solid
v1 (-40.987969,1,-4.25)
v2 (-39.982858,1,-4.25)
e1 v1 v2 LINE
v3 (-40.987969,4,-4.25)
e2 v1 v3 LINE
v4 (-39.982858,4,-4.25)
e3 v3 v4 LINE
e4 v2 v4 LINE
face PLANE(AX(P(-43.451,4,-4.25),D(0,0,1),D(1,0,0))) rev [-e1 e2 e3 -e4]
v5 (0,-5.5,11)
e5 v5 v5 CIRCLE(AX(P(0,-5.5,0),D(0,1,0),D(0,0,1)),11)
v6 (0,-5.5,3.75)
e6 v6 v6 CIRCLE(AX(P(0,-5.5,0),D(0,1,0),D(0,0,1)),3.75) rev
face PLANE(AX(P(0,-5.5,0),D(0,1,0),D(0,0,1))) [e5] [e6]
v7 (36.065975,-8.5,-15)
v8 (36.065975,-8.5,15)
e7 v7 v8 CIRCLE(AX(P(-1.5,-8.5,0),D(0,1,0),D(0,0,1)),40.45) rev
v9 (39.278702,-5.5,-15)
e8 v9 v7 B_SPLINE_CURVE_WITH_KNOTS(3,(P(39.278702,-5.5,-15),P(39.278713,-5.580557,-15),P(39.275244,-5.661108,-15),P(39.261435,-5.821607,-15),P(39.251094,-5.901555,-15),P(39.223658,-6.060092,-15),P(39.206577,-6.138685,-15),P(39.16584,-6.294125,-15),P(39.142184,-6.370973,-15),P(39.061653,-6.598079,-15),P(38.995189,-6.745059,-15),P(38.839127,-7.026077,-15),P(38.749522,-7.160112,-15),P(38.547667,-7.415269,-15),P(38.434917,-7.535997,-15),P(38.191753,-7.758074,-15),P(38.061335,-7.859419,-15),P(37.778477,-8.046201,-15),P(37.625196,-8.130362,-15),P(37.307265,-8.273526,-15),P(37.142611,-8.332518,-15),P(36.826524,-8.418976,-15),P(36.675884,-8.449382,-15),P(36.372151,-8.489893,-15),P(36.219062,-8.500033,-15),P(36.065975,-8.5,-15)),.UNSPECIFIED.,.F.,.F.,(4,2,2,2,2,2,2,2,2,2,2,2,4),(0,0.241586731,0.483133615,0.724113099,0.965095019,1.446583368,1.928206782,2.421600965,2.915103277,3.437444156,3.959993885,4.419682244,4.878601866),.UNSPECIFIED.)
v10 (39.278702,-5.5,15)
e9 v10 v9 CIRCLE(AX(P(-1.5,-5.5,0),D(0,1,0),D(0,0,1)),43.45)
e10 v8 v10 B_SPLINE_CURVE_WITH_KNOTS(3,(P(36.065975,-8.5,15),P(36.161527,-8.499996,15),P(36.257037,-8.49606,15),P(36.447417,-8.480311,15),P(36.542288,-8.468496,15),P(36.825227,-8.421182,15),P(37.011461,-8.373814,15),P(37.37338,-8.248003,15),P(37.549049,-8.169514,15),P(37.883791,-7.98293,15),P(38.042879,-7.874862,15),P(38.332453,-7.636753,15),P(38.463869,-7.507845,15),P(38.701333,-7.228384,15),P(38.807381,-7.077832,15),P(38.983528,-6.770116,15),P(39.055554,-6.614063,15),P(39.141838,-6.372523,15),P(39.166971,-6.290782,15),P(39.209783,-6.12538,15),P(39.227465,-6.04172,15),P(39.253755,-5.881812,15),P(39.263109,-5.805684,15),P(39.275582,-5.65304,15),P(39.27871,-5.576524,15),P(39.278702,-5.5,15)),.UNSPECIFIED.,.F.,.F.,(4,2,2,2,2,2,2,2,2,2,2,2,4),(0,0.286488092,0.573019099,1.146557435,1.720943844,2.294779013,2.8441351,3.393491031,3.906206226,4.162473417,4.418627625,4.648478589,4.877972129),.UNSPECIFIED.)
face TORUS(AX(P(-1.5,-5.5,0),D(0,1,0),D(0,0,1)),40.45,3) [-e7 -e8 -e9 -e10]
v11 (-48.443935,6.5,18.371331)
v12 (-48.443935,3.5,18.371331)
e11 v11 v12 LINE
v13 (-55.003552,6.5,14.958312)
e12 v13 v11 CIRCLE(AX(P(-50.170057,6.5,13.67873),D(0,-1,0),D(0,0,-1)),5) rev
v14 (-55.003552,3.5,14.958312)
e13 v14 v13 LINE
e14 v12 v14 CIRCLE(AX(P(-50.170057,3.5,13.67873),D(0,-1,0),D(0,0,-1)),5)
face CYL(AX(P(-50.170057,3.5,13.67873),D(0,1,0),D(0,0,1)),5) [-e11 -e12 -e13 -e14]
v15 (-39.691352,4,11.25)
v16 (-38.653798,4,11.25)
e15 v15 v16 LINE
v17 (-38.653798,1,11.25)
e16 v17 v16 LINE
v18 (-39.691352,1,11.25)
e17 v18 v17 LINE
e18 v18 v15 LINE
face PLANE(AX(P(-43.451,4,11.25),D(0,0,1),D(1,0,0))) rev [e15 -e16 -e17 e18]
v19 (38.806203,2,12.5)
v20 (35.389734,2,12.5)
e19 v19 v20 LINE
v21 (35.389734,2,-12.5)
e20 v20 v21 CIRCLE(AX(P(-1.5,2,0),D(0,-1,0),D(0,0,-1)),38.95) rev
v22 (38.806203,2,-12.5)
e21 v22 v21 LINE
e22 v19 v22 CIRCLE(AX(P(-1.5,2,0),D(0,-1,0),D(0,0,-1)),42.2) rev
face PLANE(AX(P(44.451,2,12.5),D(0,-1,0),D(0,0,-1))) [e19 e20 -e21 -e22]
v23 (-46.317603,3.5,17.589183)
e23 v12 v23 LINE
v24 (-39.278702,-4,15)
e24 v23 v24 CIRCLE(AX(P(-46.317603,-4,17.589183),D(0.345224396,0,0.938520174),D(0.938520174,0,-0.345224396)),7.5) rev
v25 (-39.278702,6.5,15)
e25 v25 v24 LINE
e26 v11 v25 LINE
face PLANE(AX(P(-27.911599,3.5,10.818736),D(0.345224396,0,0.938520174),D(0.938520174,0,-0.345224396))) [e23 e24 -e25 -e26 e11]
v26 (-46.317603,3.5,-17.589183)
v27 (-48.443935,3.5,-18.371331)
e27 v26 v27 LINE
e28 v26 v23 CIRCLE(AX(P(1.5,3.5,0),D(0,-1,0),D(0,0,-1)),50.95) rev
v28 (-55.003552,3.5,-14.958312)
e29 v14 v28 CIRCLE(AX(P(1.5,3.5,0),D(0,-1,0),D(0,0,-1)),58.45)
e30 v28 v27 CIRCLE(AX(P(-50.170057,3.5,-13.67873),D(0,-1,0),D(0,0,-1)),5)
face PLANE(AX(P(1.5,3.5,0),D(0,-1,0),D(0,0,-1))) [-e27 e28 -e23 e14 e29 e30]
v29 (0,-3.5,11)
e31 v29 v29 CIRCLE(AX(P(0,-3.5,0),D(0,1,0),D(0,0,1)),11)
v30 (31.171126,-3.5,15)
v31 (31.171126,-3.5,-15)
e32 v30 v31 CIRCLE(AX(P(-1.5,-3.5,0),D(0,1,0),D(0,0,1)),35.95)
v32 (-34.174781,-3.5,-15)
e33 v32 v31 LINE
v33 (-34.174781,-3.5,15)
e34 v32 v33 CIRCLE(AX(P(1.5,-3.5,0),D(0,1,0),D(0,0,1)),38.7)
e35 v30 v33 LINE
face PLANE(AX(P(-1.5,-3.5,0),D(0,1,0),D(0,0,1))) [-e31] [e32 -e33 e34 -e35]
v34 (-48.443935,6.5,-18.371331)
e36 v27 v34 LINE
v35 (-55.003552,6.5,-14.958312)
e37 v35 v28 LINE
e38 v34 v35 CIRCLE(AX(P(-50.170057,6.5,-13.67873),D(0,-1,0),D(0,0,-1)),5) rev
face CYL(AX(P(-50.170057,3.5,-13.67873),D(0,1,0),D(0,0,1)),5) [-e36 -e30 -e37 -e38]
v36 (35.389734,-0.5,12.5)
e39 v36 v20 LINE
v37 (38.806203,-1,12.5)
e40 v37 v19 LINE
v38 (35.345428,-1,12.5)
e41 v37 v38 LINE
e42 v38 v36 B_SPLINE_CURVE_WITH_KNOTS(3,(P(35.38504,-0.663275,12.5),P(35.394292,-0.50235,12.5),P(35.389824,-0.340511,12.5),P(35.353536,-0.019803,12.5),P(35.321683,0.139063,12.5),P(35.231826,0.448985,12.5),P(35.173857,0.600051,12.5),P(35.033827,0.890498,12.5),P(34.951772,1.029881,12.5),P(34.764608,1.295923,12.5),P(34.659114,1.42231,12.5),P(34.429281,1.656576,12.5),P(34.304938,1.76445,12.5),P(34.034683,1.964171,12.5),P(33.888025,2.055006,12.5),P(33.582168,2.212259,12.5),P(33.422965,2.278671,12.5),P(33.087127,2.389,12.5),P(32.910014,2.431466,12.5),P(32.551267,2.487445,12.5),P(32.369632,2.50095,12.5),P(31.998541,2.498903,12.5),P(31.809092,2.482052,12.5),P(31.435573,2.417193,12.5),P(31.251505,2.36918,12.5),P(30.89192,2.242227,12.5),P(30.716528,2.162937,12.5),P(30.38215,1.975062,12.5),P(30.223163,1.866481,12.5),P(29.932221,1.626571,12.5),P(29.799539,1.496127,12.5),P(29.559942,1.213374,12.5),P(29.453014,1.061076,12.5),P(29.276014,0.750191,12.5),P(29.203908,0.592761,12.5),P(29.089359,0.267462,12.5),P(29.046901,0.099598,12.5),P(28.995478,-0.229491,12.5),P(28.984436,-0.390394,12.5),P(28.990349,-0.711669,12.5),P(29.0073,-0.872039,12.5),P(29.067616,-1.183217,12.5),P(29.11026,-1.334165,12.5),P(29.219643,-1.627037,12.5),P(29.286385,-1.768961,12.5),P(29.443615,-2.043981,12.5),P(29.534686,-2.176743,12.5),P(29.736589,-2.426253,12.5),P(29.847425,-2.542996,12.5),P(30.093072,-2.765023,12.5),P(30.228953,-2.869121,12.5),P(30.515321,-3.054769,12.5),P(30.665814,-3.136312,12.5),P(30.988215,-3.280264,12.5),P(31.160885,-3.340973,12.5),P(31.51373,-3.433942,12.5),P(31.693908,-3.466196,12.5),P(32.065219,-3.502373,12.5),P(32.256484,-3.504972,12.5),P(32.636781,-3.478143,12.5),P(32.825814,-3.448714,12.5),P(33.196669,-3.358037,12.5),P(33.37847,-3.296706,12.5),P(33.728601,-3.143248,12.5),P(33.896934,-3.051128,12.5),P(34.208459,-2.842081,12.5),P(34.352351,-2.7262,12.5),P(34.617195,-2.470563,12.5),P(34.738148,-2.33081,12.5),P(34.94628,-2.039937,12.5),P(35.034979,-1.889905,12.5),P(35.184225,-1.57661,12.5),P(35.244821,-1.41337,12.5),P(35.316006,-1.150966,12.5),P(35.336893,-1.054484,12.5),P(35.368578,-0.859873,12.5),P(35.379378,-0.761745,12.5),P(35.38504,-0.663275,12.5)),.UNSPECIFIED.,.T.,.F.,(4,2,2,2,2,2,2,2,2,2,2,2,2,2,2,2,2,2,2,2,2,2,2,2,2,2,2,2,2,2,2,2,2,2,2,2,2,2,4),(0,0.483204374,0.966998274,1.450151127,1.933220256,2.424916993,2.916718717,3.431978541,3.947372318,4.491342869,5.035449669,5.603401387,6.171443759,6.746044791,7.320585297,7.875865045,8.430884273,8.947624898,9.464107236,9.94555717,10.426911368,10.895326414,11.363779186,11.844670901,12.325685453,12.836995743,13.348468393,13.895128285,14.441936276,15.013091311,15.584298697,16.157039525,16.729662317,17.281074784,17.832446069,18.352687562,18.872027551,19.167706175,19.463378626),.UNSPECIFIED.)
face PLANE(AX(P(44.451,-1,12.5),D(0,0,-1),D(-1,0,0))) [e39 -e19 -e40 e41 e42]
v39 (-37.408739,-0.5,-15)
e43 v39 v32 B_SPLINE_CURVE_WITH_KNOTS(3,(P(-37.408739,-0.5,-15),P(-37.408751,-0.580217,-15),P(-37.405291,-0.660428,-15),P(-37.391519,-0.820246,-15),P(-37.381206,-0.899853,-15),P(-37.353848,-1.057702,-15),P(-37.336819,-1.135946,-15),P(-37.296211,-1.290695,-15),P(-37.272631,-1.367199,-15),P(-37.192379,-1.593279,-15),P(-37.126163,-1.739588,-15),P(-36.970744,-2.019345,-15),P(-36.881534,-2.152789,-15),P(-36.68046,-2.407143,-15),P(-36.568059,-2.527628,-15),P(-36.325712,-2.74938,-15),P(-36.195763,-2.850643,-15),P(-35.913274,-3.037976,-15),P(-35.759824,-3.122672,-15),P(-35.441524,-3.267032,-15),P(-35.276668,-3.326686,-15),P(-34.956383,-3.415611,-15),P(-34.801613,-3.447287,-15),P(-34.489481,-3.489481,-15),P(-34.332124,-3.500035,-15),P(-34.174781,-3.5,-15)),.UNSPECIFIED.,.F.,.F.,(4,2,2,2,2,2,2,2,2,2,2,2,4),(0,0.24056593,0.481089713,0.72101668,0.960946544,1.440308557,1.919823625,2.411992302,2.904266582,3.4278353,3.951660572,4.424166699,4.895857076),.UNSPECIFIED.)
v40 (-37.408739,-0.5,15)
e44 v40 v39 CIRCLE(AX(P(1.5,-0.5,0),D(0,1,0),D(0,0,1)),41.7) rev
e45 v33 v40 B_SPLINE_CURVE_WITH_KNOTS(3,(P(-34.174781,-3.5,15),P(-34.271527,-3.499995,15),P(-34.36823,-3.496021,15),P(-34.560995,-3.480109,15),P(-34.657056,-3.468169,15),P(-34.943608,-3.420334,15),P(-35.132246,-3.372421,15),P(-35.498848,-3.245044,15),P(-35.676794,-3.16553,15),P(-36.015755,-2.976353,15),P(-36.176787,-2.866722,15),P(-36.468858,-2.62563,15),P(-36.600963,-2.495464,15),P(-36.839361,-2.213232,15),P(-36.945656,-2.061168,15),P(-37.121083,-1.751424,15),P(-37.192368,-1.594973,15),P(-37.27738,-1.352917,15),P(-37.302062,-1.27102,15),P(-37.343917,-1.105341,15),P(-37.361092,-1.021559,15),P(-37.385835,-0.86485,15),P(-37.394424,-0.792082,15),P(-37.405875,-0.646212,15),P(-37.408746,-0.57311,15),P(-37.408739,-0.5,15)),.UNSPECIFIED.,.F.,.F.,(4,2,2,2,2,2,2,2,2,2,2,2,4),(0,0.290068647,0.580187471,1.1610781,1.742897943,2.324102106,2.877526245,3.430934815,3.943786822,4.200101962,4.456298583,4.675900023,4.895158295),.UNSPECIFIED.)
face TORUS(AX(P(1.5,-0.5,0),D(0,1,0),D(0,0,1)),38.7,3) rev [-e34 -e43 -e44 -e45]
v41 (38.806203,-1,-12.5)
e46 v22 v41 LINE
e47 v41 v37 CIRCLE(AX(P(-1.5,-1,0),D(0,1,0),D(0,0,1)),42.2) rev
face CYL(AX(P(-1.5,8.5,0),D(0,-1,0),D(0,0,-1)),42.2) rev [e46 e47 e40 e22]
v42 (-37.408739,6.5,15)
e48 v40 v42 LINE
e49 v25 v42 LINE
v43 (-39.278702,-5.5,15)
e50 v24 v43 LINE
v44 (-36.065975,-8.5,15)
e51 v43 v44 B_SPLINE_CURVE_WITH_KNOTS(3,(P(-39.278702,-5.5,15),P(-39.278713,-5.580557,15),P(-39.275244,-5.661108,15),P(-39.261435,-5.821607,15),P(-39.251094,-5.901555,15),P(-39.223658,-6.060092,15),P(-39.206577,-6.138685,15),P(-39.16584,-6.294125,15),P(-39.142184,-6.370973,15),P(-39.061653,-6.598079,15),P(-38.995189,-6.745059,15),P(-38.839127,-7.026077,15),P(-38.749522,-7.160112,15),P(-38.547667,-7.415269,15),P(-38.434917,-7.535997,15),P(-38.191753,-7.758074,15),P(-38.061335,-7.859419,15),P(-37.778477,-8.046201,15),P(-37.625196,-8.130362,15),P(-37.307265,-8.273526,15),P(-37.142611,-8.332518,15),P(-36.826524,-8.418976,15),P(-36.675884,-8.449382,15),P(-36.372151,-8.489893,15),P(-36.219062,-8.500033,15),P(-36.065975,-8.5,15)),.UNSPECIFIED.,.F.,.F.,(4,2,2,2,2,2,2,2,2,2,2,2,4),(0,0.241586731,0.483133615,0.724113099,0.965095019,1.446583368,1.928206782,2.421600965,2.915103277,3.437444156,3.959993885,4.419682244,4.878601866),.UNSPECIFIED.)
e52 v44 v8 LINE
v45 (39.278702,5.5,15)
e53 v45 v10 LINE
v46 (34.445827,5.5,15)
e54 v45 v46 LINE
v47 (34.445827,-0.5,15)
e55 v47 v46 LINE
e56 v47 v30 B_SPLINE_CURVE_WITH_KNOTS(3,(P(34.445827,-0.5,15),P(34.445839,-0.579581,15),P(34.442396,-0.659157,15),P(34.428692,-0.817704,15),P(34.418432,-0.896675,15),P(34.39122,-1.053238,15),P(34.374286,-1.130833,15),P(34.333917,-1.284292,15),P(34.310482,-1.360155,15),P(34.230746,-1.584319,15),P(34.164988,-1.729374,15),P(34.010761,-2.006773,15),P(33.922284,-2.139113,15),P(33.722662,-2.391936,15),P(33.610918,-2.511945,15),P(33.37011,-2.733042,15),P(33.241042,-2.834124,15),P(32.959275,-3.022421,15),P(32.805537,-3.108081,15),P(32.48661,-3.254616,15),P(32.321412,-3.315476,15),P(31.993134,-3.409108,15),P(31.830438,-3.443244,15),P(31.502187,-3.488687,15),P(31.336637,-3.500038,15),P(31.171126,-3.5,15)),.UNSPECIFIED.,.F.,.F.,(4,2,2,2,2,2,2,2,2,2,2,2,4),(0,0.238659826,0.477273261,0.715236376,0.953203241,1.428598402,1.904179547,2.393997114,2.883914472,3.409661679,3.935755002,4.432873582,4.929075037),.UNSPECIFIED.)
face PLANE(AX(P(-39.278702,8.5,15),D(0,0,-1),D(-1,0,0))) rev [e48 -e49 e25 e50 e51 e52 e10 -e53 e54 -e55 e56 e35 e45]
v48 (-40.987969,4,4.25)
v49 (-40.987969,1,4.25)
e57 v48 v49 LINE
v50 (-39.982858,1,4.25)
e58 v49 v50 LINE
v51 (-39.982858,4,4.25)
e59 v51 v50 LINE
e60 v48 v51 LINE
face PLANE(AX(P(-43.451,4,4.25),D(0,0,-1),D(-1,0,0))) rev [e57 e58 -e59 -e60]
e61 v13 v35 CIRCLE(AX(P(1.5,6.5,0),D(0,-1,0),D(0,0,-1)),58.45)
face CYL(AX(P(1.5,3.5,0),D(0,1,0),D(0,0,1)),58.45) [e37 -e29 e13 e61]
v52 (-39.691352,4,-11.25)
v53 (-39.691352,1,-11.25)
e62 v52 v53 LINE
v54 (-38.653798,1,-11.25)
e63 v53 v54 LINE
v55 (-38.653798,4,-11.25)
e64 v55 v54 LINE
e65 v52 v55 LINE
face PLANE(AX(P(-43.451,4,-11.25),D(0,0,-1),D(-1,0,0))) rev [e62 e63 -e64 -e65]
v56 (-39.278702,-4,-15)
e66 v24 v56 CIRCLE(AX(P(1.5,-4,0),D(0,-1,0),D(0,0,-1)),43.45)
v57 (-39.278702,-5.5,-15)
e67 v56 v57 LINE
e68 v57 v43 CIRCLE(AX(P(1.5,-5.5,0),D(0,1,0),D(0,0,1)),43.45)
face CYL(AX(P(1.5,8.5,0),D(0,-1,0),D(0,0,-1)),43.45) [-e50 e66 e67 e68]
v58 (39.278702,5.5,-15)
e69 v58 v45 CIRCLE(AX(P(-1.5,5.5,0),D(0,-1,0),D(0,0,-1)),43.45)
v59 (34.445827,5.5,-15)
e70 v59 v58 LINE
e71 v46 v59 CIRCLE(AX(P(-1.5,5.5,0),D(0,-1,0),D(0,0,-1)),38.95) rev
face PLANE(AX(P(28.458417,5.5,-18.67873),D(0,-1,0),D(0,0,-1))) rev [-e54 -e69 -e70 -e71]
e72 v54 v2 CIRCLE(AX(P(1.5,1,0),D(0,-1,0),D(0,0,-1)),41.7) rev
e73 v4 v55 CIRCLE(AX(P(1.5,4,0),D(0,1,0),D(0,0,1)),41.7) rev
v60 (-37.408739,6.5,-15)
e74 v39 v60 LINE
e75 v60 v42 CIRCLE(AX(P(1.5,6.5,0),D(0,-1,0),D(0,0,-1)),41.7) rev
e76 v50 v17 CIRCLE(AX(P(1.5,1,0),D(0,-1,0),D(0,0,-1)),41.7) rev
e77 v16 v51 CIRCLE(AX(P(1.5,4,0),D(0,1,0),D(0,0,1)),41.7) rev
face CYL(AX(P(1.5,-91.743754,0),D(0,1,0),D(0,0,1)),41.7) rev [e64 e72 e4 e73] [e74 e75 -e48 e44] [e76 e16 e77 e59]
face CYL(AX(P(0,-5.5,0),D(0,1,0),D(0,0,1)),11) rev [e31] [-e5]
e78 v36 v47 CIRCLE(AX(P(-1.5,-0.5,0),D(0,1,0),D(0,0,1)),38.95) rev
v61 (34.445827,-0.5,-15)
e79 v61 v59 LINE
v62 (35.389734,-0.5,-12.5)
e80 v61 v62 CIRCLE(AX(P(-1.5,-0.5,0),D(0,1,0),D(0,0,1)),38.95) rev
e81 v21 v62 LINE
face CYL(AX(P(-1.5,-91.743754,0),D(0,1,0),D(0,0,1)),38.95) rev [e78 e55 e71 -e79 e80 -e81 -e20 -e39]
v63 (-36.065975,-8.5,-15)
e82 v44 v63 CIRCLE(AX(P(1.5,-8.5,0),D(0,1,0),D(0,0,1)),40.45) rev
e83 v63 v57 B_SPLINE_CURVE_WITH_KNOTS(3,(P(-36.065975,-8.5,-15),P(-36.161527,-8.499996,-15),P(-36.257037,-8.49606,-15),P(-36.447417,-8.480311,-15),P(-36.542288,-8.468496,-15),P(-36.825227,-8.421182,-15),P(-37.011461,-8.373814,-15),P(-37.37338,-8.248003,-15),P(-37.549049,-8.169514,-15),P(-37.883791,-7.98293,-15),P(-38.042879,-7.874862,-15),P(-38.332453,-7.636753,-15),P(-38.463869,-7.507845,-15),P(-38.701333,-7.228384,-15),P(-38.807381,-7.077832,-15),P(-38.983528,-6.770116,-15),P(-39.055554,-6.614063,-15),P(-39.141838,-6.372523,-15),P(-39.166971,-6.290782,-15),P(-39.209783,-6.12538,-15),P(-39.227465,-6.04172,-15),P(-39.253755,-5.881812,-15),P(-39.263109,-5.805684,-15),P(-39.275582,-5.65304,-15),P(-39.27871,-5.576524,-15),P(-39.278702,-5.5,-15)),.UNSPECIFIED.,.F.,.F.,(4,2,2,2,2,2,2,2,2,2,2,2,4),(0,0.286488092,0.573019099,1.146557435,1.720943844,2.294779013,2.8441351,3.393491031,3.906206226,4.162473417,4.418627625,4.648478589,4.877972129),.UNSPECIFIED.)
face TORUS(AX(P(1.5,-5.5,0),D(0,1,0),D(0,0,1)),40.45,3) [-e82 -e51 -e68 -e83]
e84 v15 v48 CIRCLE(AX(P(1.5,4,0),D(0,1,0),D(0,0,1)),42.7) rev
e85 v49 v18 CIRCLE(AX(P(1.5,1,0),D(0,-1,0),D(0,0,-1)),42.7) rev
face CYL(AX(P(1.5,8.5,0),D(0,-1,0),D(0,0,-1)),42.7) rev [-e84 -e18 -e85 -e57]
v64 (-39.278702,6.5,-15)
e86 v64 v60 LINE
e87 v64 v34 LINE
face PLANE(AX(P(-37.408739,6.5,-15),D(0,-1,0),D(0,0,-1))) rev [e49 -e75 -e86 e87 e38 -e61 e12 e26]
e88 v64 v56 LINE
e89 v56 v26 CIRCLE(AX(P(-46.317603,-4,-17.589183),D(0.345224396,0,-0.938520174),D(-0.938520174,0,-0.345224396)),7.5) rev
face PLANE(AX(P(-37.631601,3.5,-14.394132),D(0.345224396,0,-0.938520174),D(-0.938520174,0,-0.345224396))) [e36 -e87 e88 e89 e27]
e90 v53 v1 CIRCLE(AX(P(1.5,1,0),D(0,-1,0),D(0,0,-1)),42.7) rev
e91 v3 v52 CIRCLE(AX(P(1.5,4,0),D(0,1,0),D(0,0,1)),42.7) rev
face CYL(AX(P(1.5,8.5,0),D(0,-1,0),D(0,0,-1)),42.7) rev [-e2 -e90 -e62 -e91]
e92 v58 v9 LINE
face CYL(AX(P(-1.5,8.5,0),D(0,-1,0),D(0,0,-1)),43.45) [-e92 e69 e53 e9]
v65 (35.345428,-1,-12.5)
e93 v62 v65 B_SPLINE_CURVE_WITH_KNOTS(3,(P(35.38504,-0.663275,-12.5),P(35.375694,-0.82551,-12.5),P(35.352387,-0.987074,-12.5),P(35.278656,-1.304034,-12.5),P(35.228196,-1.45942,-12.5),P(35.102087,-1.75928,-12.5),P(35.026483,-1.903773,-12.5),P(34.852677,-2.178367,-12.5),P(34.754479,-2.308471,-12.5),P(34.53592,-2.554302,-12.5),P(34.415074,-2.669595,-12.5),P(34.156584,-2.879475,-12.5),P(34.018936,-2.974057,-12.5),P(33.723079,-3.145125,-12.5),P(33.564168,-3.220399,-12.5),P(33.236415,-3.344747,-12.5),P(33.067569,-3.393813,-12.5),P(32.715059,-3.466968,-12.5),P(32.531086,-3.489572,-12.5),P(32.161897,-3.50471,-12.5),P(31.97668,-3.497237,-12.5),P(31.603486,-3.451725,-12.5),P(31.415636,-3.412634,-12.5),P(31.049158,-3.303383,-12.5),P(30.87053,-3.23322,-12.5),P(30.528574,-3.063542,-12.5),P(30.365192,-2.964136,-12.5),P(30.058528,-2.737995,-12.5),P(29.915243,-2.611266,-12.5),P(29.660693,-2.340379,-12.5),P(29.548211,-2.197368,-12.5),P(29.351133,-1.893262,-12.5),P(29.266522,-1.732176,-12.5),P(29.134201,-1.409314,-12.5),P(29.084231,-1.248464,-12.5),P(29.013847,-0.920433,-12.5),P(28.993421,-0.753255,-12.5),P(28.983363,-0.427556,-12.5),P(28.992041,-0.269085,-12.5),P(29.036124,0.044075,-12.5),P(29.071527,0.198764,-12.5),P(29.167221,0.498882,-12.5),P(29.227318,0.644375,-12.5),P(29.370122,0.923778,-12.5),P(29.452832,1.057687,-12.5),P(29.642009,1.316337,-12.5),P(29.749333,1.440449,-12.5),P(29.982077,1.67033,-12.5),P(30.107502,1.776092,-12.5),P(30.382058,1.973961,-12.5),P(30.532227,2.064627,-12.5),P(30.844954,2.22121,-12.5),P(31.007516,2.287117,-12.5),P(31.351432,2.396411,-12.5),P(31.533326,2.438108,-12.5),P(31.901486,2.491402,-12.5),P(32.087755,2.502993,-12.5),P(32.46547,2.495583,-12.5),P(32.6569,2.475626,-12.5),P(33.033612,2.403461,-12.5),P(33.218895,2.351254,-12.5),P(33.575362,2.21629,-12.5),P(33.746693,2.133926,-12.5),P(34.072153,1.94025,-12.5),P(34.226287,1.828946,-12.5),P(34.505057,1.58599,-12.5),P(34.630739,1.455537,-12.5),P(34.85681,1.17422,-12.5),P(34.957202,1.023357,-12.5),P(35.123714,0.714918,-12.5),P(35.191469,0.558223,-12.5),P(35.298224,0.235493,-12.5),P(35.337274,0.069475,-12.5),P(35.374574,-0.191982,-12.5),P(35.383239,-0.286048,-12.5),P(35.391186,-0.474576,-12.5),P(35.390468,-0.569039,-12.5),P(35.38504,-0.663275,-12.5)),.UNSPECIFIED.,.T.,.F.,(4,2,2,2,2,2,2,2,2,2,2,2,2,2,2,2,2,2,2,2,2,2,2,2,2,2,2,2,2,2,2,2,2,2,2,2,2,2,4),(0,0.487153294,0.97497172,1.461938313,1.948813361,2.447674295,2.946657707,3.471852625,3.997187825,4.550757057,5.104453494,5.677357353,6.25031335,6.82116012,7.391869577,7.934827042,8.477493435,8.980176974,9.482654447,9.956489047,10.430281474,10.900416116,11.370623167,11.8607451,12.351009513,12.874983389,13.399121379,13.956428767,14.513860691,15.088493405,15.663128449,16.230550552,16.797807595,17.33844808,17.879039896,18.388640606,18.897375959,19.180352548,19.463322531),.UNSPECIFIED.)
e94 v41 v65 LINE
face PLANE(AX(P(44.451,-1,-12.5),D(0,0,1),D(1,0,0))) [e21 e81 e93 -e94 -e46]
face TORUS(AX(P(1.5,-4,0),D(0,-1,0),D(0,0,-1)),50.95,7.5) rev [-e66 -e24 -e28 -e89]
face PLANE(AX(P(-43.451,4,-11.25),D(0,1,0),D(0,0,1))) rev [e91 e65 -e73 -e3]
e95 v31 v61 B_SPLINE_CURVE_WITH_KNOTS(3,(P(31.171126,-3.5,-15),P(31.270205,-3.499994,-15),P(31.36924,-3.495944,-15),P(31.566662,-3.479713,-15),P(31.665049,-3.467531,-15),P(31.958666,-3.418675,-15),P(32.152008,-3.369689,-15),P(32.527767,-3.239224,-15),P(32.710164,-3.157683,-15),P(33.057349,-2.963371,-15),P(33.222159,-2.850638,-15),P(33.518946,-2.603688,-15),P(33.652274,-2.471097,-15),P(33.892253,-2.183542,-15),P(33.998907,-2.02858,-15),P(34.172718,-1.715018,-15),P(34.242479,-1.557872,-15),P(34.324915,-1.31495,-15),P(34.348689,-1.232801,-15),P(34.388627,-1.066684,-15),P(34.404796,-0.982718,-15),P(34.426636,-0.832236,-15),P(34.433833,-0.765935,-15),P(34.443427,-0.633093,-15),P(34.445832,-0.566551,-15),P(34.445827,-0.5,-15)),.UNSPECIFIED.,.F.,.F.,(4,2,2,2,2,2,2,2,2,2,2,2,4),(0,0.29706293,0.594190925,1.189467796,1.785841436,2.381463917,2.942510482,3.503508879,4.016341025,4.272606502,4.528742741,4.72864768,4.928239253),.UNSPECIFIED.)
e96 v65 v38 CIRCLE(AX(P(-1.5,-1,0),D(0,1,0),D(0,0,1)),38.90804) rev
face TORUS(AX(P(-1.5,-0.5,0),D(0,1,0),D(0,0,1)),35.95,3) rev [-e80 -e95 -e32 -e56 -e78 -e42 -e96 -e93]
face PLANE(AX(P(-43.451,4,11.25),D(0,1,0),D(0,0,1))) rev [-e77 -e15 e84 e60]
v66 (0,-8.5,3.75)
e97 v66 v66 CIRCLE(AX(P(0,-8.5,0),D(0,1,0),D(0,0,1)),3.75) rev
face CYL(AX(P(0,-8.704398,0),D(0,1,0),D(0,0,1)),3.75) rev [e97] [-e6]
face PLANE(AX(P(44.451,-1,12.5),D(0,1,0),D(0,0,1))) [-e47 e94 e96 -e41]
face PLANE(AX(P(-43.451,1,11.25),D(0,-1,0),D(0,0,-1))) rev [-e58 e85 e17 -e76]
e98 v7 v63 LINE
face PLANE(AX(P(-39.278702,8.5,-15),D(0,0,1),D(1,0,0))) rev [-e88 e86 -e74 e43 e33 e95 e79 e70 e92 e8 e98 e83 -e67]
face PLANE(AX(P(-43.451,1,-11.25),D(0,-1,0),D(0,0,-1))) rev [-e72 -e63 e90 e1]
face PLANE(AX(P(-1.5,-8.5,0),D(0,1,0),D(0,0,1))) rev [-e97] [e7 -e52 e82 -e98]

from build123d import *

# Parameters (mm, degrees)
BOSS_EXTRUDE1_DEPTH      = 8.5
CUT_EXTRUDE4_DEPTH       = 12
FILLET1_R                = 3
CUT_EXTRUDE5_DEPTH       = 46.354741112
CUT_EXTRUDE5_DEPTH_BACK  = 46.354741112
SKETCH6_W                = 4.541260622
SKETCH6_H                = 2
CUT_EXTRUDE6_START       = 1
CUT_EXTRUDE6_DEPTH       = 3
CUT_EXTRUDE7_REACH       = 47.355
CUT_EXTRUDE7_END_RADIUS  = 42.2
SKETCH8_W                = 25
SKETCH8_H                = 3
BOSS_EXTRUDE2_START      = 6.5
BOSS_EXTRUDE2_DEPTH      = 3
FILLET2_R                = 5
SKETCH10_R               = 11
CUT_EXTRUDE8_DEPTH       = 2
CUT_EXTRUDE9_REACH       = 63.124
SKETCH11_R               = 3.75
FILLET3_R                = 7.5
CUT_EXTRUDE10_DEPTH      = 61.534679882
CUT_EXTRUDE10_DEPTH_BACK = 61.534679882
SKETCH12_W               = 19.340558592
SKETCH12_H               = 3


# Read off the part's stored shape, not the designer's step: Cut-Extrude6
with BuildPart() as part:
    # Sketch1 → Boss-Extrude1 (new, symmetric)
    with BuildSketch(Plane(origin=(0, 0, 0), x_dir=(1, 0, 0), z_dir=(0, 1, 0))):
        with BuildLine():
            Line((-39.278701549, 15), (39.278701549, 15))
            ThreePointArc((39.278701549, 15), (41.95, 0), (39.278701549, -15))
            Line((39.278701549, -15), (-39.278701549, -15))
            ThreePointArc((-39.278701549, -15), (-41.95, 0), (-39.278701549, 15))
        make_face()
    extrude(amount=BOSS_EXTRUDE1_DEPTH, both=True)

    # Sketch5 → Cut-Extrude4 (cut)
    with BuildSketch(Plane(origin=(0, 8.5, 0), x_dir=(1, 0, 0), z_dir=(0, 1, 0))):
        with BuildLine():
            Line((-37.408739378, 15), (34.445827296, 15))
            ThreePointArc((34.445827296, 15), (37.45, 0), (34.445827296, -15))
            Line((34.445827296, -15), (-37.408739378, -15))
            ThreePointArc((-37.408739378, -15), (-40.2, 0), (-37.408739378, 15))
        make_face()
    extrude(amount=-CUT_EXTRUDE4_DEPTH, mode=Mode.SUBTRACT)

    # Fillet1
    fillet1_edges = [part.edges().sort_by_distance(p)[0] for p in [
        (-40.2, -3.5, 0),
        (37.45, -3.5, 0),
        (-41.95, -8.5, 0),
        (41.95, -8.5, 0),
    ]]
    fillet(fillet1_edges, radius=FILLET1_R)

    # Sketch6 → Cut-Extrude5 (cut, two sides: drawn at the far end of the back side and taken through both)
    with BuildSketch(Plane.XY.offset(-CUT_EXTRUDE5_DEPTH_BACK)):
        with Locations((-39.679369689, 7.5)):
            Rectangle(SKETCH6_W, SKETCH6_H)
    extrude(amount=CUT_EXTRUDE5_DEPTH + CUT_EXTRUDE5_DEPTH_BACK, mode=Mode.SUBTRACT)

    # Cut-Extrude6 outline → Cut-Extrude6 (cut)
    with BuildSketch(Plane(origin=(0, 0, 0), x_dir=(1, 0, 0), z_dir=(0, 1, 0)).offset(CUT_EXTRUDE6_START)):
        with BuildLine():
            ThreePointArc((-40.987968885, -4.25), (-40.485797555, -7.777069093), (-39.691352248, -11.25))
            Line((-39.691352248, -11.25), (-38.653798077, -11.25))
            ThreePointArc((-38.653798077, -11.25), (-39.468108328, -7.778438147), (-39.982857905, -4.25))
            Line((-39.982857905, -4.25), (-40.987968885, -4.25))
        make_face()
        with BuildLine():
            Line((-40.987968885, 4.25), (-39.982857905, 4.25))
            ThreePointArc((-39.982857905, 4.25), (-39.468108328, 7.778438147), (-38.653798077, 11.25))
            Line((-38.653798077, 11.25), (-39.691352248, 11.25))
            ThreePointArc((-39.691352248, 11.25), (-40.485797555, 7.777069093), (-40.987968885, 4.25))
        make_face()
    extrude(amount=CUT_EXTRUDE6_DEPTH, mode=Mode.SUBTRACT)

    # Cut-Extrude7: up to this cylinder (the profile starts inside it)
    cut_extrude7_end = Plane(origin=(-1.5, 0.5, 0), z_dir=(0, -1, 0)) * Cylinder(CUT_EXTRUDE7_END_RADIUS, 180.11, mode=Mode.PRIVATE)
    # Sketch8 → Cut-Extrude7 (cut, up to the surface)
    with BuildSketch(Plane(origin=(0, 0, 0), x_dir=(0, 0, -1), z_dir=(1, 0, 0)), mode=Mode.PRIVATE) as cut_extrude7_sk1:
        with Locations((0, 0.5)):
            Rectangle(SKETCH8_W, SKETCH8_H)
    cut_extrude7_tool1 = extrude(cut_extrude7_sk1.sketch, amount=CUT_EXTRUDE7_REACH, mode=Mode.PRIVATE) & cut_extrude7_end
    add(cut_extrude7_tool1.solids().sort_by_distance((0, 0.5, 0))[0], mode=Mode.SUBTRACT)

    # Sketch9 → Boss-Extrude2 (add)
    with BuildSketch(Plane(origin=(0, 0, 0), x_dir=(1, 0, 0), z_dir=(0, 1, 0)).offset(BOSS_EXTRUDE2_START)):
        with BuildLine():
            Line((-53.356504155, 20.178365938), (-39.278701549, 15))
            ThreePointArc((-39.278701549, 15), (-41.95, 0), (-39.278701549, -15))
            Line((-39.278701549, -15), (-53.356504155, -20.178365938))
            ThreePointArc((-53.356504155, -20.178365938), (-56.95, 0), (-53.356504155, 20.178365938))
        make_face()
    extrude(amount=-BOSS_EXTRUDE2_DEPTH)

    # Fillet2
    fillet2_edges = [part.edges().sort_by_distance(p)[0] for p in [
        (-53.356504155, 5, 20.178365938),
        (-53.356504155, 5, -20.178365938),
    ]]
    fillet(fillet2_edges, radius=FILLET2_R)

    # Sketch10 → Cut-Extrude8 (cut)
    with BuildSketch(Plane(origin=(0, -3.5, 0), x_dir=(1, 0, 0), z_dir=(0, 1, 0))):
        with Locations(Location((0, 0, 0), (0, 0, 270))):
            Circle(SKETCH10_R)
    extrude(amount=-CUT_EXTRUDE8_DEPTH, mode=Mode.SUBTRACT)

    # Sketch11 → Cut-Extrude9 (cut, up to next)
    with BuildSketch(Plane(origin=(0, -3.5, 0), x_dir=(1, 0, 0), z_dir=(0, 1, 0)), mode=Mode.PRIVATE) as cut_extrude9_sk1:
        with Locations(Location((0, 0, 0), (0, 0, 270))):
            Circle(SKETCH11_R)
    cut_extrude9_tool1 = extrude(cut_extrude9_sk1.sketch, amount=-CUT_EXTRUDE9_REACH, mode=Mode.PRIVATE) & part.part
    add(cut_extrude9_tool1.solids().sort_by_distance((0, -3.5, 0))[0], mode=Mode.SUBTRACT)

    # Fillet3
    fillet3_edges = [part.edges().sort_by_distance(p)[0] for p in [
        (-41.95, 3.5, 0),
    ]]
    fillet(fillet3_edges, radius=FILLET3_R)

    # Sketch12 → Cut-Extrude10 (cut, two sides: drawn at the far end of the back side and taken through both)
    with BuildSketch(Plane.XY.offset(-CUT_EXTRUDE10_DEPTH_BACK)):
        with Locations((38.128696485, 7)):
            Rectangle(SKETCH12_W, SKETCH12_H)
    extrude(amount=CUT_EXTRUDE10_DEPTH + CUT_EXTRUDE10_DEPTH_BACK, mode=Mode.SUBTRACT)


solid = part.part
